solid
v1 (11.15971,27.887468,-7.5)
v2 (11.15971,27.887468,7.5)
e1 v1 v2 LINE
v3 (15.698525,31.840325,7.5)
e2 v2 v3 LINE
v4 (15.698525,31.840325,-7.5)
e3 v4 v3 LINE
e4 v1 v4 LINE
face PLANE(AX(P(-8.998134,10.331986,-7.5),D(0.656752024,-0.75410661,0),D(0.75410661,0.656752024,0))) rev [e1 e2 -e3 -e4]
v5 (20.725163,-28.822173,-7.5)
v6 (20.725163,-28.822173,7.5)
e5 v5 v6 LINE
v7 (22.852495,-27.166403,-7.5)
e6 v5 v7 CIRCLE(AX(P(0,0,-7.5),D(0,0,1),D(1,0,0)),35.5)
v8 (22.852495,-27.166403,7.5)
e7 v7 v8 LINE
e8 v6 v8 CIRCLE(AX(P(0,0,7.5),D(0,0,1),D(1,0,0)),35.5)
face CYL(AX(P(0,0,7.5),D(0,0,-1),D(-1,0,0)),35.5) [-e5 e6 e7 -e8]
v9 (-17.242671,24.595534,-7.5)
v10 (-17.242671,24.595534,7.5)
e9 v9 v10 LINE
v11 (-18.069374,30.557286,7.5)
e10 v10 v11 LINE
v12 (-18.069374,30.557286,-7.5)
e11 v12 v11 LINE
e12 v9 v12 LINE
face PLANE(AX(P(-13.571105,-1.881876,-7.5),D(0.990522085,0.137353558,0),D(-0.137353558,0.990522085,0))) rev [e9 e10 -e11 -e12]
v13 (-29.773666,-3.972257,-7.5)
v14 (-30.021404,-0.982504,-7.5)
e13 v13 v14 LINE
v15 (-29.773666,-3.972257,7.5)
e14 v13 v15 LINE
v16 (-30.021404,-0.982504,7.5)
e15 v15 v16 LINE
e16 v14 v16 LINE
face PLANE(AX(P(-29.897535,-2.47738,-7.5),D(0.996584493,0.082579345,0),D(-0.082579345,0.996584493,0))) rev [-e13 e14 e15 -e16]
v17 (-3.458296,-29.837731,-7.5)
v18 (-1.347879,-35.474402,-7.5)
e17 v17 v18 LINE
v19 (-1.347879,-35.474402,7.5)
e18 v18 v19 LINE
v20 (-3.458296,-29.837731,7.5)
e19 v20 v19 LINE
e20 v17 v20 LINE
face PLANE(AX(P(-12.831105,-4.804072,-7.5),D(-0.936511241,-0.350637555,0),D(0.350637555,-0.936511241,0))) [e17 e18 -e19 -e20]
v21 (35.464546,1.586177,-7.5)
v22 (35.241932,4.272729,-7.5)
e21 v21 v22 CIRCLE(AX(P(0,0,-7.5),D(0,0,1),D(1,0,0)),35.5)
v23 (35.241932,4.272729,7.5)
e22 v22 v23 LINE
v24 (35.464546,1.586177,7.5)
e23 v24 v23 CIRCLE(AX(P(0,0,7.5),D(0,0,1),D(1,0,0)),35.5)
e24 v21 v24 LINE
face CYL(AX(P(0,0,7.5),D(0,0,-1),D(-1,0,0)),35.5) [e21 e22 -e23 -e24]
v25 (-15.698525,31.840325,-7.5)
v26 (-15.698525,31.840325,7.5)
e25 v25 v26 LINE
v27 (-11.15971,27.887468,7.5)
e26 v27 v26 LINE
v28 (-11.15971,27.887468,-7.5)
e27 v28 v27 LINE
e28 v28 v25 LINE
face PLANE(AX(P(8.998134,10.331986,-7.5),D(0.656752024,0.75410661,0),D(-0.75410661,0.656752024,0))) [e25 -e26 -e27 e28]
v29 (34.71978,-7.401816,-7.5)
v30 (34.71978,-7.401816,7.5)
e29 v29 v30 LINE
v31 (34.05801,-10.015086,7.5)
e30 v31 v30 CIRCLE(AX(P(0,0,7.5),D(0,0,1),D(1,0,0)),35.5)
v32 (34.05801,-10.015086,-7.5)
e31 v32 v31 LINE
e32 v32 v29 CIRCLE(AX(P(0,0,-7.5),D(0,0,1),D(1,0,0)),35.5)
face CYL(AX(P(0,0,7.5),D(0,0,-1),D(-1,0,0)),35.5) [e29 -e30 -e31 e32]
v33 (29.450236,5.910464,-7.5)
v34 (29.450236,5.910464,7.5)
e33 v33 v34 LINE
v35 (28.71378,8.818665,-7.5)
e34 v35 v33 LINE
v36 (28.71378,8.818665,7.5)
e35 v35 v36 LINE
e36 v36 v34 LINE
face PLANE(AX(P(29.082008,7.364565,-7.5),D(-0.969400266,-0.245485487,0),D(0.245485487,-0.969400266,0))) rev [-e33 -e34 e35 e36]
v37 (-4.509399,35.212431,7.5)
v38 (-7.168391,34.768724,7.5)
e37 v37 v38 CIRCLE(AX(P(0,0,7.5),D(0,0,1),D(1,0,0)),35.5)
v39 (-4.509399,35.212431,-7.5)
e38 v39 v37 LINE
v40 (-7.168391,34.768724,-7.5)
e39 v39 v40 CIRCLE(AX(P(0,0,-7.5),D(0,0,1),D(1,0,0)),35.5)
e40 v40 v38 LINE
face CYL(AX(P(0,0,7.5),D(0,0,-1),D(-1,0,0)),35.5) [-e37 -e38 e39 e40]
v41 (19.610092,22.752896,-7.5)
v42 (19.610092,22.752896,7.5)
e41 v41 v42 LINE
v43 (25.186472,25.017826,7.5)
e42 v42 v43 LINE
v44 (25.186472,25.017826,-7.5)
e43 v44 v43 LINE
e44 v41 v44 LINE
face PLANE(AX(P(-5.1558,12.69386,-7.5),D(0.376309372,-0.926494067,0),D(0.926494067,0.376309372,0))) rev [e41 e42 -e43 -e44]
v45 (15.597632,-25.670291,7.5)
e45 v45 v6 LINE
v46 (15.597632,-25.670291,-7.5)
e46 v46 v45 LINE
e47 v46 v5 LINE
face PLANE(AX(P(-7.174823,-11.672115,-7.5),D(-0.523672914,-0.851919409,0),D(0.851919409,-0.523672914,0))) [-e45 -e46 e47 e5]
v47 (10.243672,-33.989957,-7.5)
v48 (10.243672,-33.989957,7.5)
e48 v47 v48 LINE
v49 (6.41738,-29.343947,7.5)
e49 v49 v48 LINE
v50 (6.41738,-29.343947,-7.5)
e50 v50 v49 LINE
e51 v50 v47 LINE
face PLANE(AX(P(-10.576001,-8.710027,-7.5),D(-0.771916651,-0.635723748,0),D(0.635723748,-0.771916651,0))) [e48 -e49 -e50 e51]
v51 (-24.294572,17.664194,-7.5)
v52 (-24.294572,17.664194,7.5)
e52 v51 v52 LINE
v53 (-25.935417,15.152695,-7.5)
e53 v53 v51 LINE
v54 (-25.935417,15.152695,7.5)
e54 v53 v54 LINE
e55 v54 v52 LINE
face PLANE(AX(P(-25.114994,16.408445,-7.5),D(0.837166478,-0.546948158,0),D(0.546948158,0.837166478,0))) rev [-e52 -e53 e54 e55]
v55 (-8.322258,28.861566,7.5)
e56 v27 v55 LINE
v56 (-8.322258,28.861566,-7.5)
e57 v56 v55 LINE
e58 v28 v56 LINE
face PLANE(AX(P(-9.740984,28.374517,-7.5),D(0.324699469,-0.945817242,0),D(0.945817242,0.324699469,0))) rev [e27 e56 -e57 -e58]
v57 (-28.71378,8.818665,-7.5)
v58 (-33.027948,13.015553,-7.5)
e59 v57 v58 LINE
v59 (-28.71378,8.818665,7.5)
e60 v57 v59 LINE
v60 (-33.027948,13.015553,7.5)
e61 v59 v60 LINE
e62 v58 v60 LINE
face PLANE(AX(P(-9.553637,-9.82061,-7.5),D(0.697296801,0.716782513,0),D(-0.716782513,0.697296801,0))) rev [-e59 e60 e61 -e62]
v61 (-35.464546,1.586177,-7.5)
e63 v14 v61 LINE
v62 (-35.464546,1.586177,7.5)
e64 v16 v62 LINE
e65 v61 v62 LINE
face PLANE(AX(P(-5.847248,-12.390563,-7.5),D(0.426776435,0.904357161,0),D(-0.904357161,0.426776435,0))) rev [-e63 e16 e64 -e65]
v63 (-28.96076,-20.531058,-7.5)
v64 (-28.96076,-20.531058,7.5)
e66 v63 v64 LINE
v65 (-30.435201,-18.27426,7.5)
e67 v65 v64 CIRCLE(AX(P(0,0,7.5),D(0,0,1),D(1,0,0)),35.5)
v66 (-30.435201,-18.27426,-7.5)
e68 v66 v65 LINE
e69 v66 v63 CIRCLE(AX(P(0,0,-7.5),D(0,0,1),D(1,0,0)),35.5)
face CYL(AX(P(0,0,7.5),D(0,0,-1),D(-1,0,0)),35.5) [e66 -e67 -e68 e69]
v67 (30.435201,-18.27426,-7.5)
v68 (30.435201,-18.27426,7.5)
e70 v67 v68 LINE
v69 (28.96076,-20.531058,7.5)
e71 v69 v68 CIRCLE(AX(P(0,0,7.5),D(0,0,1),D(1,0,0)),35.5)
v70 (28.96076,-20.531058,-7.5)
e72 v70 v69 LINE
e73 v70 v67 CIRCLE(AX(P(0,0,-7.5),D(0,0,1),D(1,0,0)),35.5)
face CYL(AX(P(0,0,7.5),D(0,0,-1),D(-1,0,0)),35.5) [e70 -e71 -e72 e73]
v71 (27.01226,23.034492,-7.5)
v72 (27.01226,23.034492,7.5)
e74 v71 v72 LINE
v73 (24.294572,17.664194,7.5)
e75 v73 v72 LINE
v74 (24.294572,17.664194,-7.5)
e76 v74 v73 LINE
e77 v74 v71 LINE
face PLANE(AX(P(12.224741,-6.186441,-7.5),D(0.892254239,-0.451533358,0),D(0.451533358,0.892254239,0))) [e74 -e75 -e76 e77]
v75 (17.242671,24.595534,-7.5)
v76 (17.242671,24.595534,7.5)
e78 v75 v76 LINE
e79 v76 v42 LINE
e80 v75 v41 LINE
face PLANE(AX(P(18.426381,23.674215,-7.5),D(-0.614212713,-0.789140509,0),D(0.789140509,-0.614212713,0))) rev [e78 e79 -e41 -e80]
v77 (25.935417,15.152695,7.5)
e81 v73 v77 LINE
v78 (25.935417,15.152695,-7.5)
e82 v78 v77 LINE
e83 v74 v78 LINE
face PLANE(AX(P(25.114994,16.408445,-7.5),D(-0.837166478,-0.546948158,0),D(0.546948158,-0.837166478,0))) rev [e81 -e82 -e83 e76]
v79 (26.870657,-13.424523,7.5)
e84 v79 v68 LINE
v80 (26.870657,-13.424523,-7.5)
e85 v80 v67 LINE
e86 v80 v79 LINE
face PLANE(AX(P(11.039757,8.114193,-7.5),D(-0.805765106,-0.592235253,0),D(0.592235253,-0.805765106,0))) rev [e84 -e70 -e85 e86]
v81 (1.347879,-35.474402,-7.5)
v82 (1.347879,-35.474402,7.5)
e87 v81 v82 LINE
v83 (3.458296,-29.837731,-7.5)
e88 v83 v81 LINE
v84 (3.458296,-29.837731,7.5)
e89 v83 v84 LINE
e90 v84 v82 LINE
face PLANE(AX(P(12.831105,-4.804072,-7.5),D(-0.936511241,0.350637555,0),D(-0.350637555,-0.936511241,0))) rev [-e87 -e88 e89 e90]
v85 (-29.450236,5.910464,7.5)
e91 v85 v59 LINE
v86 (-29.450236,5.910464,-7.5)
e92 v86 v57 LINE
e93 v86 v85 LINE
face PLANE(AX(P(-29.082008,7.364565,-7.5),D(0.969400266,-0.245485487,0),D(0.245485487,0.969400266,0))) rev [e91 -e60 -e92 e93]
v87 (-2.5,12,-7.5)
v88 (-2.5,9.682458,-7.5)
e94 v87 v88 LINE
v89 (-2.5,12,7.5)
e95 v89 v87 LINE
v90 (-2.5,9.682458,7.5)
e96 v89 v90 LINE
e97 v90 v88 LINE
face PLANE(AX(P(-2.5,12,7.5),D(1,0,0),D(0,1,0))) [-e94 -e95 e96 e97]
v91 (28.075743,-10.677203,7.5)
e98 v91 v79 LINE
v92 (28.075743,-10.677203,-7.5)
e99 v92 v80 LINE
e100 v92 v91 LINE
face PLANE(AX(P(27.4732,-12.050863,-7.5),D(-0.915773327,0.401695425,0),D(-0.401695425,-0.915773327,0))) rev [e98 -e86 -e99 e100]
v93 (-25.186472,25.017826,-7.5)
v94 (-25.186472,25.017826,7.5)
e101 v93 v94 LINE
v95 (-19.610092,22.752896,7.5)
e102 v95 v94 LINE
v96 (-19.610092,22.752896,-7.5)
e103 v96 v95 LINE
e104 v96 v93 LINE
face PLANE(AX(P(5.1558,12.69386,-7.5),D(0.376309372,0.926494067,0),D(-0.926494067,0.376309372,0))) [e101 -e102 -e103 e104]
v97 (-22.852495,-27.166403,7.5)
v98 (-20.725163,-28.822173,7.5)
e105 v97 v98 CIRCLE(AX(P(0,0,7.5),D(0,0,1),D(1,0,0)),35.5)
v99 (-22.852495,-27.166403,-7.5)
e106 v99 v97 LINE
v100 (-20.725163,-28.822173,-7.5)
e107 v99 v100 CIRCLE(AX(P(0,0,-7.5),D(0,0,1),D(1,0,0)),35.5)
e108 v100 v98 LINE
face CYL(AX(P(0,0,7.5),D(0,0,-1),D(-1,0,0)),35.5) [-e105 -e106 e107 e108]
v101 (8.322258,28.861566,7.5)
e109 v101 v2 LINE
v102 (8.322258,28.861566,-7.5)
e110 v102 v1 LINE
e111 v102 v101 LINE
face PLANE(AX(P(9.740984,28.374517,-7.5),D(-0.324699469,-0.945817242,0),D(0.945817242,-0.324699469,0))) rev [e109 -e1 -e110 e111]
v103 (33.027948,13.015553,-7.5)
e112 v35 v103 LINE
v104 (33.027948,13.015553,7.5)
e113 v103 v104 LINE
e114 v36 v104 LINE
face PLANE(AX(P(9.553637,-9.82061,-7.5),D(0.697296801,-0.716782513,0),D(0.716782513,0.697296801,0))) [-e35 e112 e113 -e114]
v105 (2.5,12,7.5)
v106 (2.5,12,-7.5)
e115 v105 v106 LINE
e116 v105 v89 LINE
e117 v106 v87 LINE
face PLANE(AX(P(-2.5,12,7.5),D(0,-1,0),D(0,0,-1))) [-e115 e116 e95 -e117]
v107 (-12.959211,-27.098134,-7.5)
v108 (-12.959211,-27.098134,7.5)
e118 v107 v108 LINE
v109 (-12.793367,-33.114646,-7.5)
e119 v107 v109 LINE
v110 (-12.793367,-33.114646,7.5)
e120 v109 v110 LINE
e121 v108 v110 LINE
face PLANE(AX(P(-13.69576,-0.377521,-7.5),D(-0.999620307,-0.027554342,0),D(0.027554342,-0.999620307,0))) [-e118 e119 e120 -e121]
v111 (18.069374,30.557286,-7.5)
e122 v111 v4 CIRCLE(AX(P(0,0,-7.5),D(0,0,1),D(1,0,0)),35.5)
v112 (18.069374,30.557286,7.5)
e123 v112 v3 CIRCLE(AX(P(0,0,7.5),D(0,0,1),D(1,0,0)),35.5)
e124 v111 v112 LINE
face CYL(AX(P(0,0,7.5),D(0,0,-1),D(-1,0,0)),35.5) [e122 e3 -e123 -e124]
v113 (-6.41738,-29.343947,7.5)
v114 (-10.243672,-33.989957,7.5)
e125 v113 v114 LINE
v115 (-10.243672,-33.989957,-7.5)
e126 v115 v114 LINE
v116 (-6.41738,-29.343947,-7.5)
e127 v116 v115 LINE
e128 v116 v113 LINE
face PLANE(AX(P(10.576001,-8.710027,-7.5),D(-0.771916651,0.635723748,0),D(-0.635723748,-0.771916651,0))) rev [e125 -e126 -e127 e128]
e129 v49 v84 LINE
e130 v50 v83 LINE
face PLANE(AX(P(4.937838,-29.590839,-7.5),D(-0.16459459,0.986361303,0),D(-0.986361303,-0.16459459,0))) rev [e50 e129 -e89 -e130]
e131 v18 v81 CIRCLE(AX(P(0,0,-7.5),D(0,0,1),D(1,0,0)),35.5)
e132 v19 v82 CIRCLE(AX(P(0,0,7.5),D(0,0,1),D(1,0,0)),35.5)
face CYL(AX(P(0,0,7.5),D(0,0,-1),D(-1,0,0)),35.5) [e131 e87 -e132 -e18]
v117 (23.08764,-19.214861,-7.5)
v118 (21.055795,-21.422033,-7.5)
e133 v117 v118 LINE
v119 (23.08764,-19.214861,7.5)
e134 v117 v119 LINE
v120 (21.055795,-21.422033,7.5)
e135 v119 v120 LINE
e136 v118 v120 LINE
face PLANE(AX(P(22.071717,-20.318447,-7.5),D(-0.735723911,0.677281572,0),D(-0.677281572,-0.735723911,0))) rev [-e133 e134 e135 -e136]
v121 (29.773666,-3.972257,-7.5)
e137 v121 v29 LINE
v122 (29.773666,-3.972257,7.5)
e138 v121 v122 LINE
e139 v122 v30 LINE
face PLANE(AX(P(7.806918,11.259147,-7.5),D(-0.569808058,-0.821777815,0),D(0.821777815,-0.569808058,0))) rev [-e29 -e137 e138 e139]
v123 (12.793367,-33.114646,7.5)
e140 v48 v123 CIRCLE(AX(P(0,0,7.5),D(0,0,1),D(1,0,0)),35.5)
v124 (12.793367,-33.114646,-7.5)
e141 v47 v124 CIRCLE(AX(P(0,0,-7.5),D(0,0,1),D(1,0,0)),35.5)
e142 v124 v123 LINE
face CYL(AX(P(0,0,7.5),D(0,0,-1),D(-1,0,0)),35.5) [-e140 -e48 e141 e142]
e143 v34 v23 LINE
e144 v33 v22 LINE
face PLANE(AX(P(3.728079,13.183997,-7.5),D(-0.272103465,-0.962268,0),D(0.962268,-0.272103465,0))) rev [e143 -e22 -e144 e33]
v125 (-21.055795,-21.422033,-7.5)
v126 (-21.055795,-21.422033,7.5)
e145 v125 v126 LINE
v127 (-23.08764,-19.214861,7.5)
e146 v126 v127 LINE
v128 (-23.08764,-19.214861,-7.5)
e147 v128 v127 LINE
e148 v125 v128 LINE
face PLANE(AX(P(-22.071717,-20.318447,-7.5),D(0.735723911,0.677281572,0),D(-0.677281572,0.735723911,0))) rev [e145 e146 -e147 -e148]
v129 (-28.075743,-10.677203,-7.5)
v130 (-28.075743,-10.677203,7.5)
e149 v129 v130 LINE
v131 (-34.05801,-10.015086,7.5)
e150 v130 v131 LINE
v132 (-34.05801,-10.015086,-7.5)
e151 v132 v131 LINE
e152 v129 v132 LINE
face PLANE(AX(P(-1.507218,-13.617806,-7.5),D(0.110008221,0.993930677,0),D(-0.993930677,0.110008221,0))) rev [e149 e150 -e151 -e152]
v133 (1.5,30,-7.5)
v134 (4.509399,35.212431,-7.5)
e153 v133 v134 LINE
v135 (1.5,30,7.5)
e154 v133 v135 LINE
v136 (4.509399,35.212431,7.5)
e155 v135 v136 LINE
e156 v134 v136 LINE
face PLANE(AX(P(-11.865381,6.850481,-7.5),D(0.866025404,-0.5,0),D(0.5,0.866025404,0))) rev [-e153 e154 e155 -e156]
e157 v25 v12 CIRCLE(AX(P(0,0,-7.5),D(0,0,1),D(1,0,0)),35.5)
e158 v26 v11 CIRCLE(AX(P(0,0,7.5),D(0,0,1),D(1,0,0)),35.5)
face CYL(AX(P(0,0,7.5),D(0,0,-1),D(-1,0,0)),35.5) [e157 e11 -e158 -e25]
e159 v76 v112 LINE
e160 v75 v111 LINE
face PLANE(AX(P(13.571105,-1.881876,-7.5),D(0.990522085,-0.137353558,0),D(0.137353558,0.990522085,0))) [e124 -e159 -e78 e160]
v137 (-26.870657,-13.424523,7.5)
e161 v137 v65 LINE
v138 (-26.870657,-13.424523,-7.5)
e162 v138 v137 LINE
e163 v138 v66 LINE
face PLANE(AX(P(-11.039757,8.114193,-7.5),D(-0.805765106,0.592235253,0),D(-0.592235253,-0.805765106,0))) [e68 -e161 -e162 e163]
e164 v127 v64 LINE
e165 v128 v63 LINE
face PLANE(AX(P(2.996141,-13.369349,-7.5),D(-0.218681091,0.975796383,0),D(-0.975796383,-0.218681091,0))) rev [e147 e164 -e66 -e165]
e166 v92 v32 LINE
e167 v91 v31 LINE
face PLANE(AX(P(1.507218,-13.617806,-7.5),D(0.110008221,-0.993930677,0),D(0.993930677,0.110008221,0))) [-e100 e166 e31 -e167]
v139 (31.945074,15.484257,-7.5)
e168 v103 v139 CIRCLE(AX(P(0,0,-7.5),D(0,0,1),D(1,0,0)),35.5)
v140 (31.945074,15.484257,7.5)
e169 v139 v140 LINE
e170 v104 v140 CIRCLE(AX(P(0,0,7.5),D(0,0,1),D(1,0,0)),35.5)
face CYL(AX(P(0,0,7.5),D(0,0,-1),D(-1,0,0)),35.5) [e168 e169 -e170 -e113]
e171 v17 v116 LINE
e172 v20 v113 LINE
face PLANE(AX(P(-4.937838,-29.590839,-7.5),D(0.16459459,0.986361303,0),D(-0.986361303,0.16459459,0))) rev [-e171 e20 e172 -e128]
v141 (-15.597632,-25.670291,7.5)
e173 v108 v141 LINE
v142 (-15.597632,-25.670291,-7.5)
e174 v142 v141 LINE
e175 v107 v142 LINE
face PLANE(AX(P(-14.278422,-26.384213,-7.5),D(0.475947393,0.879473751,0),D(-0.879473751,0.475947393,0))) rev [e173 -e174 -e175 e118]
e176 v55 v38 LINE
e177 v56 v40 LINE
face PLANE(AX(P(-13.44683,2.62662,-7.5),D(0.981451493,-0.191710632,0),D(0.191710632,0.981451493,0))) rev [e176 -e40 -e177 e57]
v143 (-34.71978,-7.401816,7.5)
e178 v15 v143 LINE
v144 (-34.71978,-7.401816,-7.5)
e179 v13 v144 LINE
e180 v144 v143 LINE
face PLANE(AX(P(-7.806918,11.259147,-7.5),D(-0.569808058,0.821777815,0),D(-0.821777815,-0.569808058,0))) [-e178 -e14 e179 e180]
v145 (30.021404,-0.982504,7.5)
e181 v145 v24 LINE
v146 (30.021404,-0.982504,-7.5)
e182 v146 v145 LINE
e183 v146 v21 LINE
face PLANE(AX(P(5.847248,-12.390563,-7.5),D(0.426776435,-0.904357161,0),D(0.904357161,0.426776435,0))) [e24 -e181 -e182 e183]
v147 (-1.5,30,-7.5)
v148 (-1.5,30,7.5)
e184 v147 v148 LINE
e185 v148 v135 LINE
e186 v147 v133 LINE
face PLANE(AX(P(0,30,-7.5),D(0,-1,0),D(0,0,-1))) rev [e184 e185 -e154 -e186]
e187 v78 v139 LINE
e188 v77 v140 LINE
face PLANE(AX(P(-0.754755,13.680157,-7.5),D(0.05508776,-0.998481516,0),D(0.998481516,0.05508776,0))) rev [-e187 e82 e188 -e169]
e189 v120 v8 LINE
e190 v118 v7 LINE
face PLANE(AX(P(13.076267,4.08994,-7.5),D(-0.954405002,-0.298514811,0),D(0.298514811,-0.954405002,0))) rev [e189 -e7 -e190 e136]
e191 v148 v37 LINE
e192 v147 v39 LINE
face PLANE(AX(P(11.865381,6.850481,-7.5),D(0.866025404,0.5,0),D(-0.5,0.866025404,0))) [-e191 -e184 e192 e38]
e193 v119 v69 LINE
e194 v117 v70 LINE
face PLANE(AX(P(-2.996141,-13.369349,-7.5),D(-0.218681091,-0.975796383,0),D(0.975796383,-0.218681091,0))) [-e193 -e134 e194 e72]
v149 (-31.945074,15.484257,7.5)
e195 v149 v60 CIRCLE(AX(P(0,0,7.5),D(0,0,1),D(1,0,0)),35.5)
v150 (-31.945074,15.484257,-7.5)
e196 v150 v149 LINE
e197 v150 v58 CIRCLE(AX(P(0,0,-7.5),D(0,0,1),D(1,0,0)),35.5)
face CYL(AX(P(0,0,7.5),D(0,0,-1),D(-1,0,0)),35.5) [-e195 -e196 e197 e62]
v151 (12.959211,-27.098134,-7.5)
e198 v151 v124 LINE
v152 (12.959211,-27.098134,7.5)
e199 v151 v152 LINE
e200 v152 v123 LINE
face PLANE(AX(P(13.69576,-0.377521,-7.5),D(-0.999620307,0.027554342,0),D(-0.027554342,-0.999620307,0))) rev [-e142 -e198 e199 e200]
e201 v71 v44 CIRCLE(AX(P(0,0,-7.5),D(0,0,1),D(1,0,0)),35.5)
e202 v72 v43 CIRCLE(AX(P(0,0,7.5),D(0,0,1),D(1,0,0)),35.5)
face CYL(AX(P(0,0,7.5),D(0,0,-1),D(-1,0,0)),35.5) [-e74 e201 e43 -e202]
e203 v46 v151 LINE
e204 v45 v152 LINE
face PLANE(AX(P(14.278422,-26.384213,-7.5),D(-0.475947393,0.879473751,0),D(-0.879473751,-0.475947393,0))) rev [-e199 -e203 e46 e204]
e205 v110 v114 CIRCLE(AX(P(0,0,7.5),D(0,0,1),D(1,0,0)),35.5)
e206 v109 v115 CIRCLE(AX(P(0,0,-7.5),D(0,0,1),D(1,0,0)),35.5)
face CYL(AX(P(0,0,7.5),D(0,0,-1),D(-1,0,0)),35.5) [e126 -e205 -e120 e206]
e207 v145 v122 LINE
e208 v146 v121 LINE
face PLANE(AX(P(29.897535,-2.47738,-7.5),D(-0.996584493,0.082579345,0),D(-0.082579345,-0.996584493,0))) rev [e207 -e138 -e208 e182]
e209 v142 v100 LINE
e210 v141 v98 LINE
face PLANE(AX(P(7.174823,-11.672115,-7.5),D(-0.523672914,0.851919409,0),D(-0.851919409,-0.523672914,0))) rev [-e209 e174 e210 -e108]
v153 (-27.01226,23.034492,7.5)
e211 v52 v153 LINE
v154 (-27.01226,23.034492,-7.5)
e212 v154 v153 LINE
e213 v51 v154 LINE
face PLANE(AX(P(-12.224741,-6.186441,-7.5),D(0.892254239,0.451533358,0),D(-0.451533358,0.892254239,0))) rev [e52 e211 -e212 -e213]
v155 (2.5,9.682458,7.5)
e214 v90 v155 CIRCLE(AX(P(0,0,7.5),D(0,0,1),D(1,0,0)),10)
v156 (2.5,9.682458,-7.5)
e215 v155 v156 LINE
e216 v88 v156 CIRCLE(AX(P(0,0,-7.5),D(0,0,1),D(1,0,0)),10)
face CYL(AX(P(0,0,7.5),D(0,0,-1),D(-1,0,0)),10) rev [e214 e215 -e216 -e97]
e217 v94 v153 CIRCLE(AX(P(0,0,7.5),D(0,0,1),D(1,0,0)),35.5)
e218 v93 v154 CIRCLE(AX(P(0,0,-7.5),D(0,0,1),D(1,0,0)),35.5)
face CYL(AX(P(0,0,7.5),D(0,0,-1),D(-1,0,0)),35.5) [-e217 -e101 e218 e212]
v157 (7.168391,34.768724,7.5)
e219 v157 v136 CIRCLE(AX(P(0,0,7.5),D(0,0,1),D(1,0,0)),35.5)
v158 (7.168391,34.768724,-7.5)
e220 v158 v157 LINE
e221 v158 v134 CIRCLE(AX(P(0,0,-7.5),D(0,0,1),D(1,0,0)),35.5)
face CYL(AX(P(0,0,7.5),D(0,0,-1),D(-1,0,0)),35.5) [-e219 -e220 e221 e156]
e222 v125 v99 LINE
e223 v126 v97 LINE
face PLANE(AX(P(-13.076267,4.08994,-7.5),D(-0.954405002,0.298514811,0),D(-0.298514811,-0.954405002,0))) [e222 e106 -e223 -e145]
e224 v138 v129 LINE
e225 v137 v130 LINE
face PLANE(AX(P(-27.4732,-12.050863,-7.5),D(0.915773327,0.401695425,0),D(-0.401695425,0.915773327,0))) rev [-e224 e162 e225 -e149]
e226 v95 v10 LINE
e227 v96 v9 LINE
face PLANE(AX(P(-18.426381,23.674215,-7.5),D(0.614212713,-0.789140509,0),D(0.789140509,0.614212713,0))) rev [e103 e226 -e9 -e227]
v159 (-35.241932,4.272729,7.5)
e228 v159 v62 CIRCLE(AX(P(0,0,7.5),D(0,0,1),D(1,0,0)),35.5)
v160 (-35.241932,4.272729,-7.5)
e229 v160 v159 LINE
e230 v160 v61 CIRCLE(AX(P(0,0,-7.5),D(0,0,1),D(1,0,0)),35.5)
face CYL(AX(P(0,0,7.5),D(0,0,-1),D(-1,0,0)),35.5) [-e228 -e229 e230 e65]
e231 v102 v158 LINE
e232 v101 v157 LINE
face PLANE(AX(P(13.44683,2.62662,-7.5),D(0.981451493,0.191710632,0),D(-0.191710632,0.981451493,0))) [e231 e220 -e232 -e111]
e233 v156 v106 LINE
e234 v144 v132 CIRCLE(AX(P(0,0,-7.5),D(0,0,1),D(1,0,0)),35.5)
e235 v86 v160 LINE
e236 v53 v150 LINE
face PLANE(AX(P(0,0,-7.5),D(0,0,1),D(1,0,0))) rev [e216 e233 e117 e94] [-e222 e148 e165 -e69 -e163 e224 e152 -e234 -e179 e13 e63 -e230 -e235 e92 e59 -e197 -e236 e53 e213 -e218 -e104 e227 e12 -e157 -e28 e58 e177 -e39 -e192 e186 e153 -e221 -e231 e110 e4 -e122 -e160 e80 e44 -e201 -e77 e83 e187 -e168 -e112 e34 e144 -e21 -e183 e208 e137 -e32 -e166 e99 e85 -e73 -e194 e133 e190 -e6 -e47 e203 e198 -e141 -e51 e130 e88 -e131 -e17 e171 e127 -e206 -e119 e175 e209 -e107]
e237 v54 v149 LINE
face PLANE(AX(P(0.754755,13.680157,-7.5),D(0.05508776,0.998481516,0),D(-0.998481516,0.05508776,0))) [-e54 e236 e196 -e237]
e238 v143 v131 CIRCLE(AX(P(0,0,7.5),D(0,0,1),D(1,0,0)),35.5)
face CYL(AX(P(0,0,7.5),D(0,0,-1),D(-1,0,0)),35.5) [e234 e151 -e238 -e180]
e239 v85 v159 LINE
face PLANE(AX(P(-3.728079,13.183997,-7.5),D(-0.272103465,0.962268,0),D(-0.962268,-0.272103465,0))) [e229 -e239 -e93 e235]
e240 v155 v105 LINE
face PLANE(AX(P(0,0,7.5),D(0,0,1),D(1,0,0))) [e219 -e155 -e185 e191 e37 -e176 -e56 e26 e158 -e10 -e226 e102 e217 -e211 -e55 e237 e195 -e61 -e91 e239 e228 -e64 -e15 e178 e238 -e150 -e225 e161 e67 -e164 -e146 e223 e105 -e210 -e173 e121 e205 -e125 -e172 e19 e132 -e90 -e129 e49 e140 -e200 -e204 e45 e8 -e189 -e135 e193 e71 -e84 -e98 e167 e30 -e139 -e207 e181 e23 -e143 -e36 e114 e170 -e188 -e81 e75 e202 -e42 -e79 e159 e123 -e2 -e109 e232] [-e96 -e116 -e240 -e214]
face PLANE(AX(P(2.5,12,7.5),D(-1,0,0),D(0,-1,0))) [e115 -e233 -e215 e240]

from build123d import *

# Parameters (mm, degrees)
SKETCH1_R           = 35.5
BOSS_EXTRUDE1_DEPTH = 7.5
SKETCH4_OUTSIDE_W   = 93.304
SKETCH4_OUTSIDE_H   = 93.304
CUT_EXTRUDE2_DEPTH  = 53.397519025


with BuildPart() as part:
    # Sketch1 → Boss-Extrude1 (new, symmetric)
    with BuildSketch(Plane.XY):
        Circle(SKETCH1_R)
        with BuildLine():
            Line((-2.5, 12), (2.5, 12))
            Line((2.5, 12), (2.5, 9.682458366))
            ThreePointArc((2.5, 9.682458366), (0, -10), (-2.5, 9.682458366))
            Line((-2.5, 9.682458366), (-2.5, 12))
        make_face(mode=Mode.SUBTRACT)
    extrude(amount=BOSS_EXTRUDE1_DEPTH, both=True)

    # Sketch4 outside → Cut-Extrude2 (cut, through all)
    with BuildSketch(Plane.XY.offset(7.5)):
        Rectangle(SKETCH4_OUTSIDE_W, SKETCH4_OUTSIDE_H)
        with BuildLine():
            Line((1.5, 30), (-1.5, 30))
            Line((-1.5, 30), (-4.509398661, 35.21243138))
            ThreePointArc((-4.509398661, 35.21243138), (-5.843107955, 35.015826271), (-7.168390776, 34.768724073))
            Line((-7.168390776, 34.768724073), (-8.322258214, 28.861566455))
            Line((-8.322258214, 28.861566455), (-11.159709939, 27.887468047))
            Line((-11.159709939, 27.887468047), (-15.698524782, 31.84032537))
            ThreePointArc((-15.698524782, 31.84032537), (-16.896132453, 31.221318168), (-18.069373842, 30.557286021))
            Line((-18.069373842, 30.557286021), (-17.242670617, 24.595534351))
            Line((-17.242670617, 24.595534351), (-19.610092145, 22.752896213))
            Line((-19.610092145, 22.752896213), (-25.186472155, 25.017826053))
            ThreePointArc((-25.186472155, 25.017826053), (-26.118198829, 24.043495793), (-27.012259878, 23.034491882))
            Line((-27.012259878, 23.034491882), (-24.294572111, 17.664194461))
            Line((-24.294572111, 17.664194461), (-25.935416585, 15.152695026))
            Line((-25.935416585, 15.152695026), (-31.945074461, 15.484257091))
            ThreePointArc((-31.945074461, 15.484257091), (-32.509953096, 14.260187575), (-33.027948418, 13.015553132))
            Line((-33.027948418, 13.015553132), (-28.713779747, 8.818665013))
            Line((-28.713779747, 8.818665013), (-29.450236209, 5.910464215))
            Line((-29.450236209, 5.910464215), (-35.241932271, 4.27272861))
            ThreePointArc((-35.241932271, 4.27272861), (-35.378749502, 2.931566764), (-35.464546265, 1.586177242))
            Line((-35.464546265, 1.586177242), (-30.021403808, -0.982503625))
            Line((-30.021403808, -0.982503625), (-29.773665772, -3.972257104))
            Line((-29.773665772, -3.972257104), (-34.719779885, -7.401816314))
            ThreePointArc((-34.719779885, -7.401816314), (-34.413709441, -8.714734794), (-34.058010235, -10.015085564))
            Line((-34.058010235, -10.015085564), (-28.075742937, -10.67720275))
            Line((-28.075742937, -10.67720275), (-26.870656663, -13.42452273))
            Line((-26.870656663, -13.42452273), (-30.435200615, -18.274259589))
            ThreePointArc((-30.435200615, -18.274259589), (-29.719409978, -19.416659613), (-28.960760331, -20.531058449))
            Line((-28.960760331, -20.531058449), (-23.087639678, -19.214861283))
            Line((-23.087639678, -19.214861283), (-21.055794963, -21.422033015))
            Line((-21.055794963, -21.422033015), (-22.852495108, -27.166403283))
            ThreePointArc((-22.852495108, -27.166403283), (-21.8045513, -28.014488084), (-20.725162674, -28.822172579))
            Line((-20.725162674, -28.822172579), (-15.597632418, -25.670291447))
            Line((-15.597632418, -25.670291447), (-12.959211164, -27.098133626))
            Line((-12.959211164, -27.098133626), (-12.793367162, -33.114645652))
            ThreePointArc((-12.793367162, -33.114645652), (-11.526831157, -33.57651208), (-10.243672056, -33.989957087))
            Line((-10.243672056, -33.989957087), (-6.417379664, -29.343947217))
            Line((-6.417379664, -29.343947217), (-3.458295753, -29.837730988))
            Line((-3.458295753, -29.837730988), (-1.347879375, -35.474402337))
            ThreePointArc((-1.347879375, -35.474402337), (0, -35.5), (1.347879375, -35.474402337))
            Line((1.347879375, -35.474402337), (3.458295753, -29.837730988))
            Line((3.458295753, -29.837730988), (6.417379664, -29.343947217))
            Line((6.417379664, -29.343947217), (10.243672056, -33.989957087))
            ThreePointArc((10.243672056, -33.989957087), (11.526831157, -33.57651208), (12.793367162, -33.114645652))
            Line((12.793367162, -33.114645652), (12.959211164, -27.098133626))
            Line((12.959211164, -27.098133626), (15.597632418, -25.670291447))
            Line((15.597632418, -25.670291447), (20.725162674, -28.822172579))
            ThreePointArc((20.725162674, -28.822172579), (21.8045513, -28.014488084), (22.852495108, -27.166403283))
            Line((22.852495108, -27.166403283), (21.055794963, -21.422033015))
            Line((21.055794963, -21.422033015), (23.087639678, -19.214861283))
            Line((23.087639678, -19.214861283), (28.960760331, -20.531058449))
            ThreePointArc((28.960760331, -20.531058449), (29.719409978, -19.416659613), (30.435200615, -18.274259589))
            Line((30.435200615, -18.274259589), (26.870656663, -13.42452273))
            Line((26.870656663, -13.42452273), (28.075742937, -10.67720275))
            Line((28.075742937, -10.67720275), (34.058010235, -10.015085564))
            ThreePointArc((34.058010235, -10.015085564), (34.413709441, -8.714734793), (34.719779885, -7.401816314))
            Line((34.719779885, -7.401816314), (29.773665772, -3.972257104))
            Line((29.773665772, -3.972257104), (30.021403808, -0.982503625))
            Line((30.021403808, -0.982503625), (35.464546265, 1.586177242))
            ThreePointArc((35.464546265, 1.586177242), (35.378749502, 2.931566764), (35.241932271, 4.27272861))
            Line((35.241932271, 4.27272861), (29.450236209, 5.910464215))
            Line((29.450236209, 5.910464215), (28.713779747, 8.818665013))
            Line((28.713779747, 8.818665013), (33.027948418, 13.015553132))
            ThreePointArc((33.027948418, 13.015553132), (32.509953096, 14.260187575), (31.945074461, 15.484257091))
            Line((31.945074461, 15.484257091), (25.935416585, 15.152695026))
            Line((25.935416585, 15.152695026), (24.294572111, 17.664194461))
            Line((24.294572111, 17.664194461), (27.012259878, 23.034491882))
            ThreePointArc((27.012259878, 23.034491882), (26.118198829, 24.043495793), (25.186472155, 25.017826053))
            Line((25.186472155, 25.017826053), (19.610092145, 22.752896213))
            Line((19.610092145, 22.752896213), (17.242670617, 24.595534351))
            Line((17.242670617, 24.595534351), (18.069373842, 30.557286021))
            ThreePointArc((18.069373842, 30.557286021), (16.896132453, 31.221318168), (15.698524782, 31.84032537))
            Line((15.698524782, 31.84032537), (11.159709939, 27.887468047))
            Line((11.159709939, 27.887468047), (8.322258214, 28.861566455))
            Line((8.322258214, 28.861566455), (7.168390776, 34.768724073))
            ThreePointArc((7.168390776, 34.768724073), (5.843107955, 35.015826271), (4.509398661, 35.21243138))
            Line((4.509398661, 35.21243138), (1.5, 30))
        make_face(mode=Mode.SUBTRACT)
    extrude(amount=-CUT_EXTRUDE2_DEPTH, mode=Mode.SUBTRACT)


solid = part.part
